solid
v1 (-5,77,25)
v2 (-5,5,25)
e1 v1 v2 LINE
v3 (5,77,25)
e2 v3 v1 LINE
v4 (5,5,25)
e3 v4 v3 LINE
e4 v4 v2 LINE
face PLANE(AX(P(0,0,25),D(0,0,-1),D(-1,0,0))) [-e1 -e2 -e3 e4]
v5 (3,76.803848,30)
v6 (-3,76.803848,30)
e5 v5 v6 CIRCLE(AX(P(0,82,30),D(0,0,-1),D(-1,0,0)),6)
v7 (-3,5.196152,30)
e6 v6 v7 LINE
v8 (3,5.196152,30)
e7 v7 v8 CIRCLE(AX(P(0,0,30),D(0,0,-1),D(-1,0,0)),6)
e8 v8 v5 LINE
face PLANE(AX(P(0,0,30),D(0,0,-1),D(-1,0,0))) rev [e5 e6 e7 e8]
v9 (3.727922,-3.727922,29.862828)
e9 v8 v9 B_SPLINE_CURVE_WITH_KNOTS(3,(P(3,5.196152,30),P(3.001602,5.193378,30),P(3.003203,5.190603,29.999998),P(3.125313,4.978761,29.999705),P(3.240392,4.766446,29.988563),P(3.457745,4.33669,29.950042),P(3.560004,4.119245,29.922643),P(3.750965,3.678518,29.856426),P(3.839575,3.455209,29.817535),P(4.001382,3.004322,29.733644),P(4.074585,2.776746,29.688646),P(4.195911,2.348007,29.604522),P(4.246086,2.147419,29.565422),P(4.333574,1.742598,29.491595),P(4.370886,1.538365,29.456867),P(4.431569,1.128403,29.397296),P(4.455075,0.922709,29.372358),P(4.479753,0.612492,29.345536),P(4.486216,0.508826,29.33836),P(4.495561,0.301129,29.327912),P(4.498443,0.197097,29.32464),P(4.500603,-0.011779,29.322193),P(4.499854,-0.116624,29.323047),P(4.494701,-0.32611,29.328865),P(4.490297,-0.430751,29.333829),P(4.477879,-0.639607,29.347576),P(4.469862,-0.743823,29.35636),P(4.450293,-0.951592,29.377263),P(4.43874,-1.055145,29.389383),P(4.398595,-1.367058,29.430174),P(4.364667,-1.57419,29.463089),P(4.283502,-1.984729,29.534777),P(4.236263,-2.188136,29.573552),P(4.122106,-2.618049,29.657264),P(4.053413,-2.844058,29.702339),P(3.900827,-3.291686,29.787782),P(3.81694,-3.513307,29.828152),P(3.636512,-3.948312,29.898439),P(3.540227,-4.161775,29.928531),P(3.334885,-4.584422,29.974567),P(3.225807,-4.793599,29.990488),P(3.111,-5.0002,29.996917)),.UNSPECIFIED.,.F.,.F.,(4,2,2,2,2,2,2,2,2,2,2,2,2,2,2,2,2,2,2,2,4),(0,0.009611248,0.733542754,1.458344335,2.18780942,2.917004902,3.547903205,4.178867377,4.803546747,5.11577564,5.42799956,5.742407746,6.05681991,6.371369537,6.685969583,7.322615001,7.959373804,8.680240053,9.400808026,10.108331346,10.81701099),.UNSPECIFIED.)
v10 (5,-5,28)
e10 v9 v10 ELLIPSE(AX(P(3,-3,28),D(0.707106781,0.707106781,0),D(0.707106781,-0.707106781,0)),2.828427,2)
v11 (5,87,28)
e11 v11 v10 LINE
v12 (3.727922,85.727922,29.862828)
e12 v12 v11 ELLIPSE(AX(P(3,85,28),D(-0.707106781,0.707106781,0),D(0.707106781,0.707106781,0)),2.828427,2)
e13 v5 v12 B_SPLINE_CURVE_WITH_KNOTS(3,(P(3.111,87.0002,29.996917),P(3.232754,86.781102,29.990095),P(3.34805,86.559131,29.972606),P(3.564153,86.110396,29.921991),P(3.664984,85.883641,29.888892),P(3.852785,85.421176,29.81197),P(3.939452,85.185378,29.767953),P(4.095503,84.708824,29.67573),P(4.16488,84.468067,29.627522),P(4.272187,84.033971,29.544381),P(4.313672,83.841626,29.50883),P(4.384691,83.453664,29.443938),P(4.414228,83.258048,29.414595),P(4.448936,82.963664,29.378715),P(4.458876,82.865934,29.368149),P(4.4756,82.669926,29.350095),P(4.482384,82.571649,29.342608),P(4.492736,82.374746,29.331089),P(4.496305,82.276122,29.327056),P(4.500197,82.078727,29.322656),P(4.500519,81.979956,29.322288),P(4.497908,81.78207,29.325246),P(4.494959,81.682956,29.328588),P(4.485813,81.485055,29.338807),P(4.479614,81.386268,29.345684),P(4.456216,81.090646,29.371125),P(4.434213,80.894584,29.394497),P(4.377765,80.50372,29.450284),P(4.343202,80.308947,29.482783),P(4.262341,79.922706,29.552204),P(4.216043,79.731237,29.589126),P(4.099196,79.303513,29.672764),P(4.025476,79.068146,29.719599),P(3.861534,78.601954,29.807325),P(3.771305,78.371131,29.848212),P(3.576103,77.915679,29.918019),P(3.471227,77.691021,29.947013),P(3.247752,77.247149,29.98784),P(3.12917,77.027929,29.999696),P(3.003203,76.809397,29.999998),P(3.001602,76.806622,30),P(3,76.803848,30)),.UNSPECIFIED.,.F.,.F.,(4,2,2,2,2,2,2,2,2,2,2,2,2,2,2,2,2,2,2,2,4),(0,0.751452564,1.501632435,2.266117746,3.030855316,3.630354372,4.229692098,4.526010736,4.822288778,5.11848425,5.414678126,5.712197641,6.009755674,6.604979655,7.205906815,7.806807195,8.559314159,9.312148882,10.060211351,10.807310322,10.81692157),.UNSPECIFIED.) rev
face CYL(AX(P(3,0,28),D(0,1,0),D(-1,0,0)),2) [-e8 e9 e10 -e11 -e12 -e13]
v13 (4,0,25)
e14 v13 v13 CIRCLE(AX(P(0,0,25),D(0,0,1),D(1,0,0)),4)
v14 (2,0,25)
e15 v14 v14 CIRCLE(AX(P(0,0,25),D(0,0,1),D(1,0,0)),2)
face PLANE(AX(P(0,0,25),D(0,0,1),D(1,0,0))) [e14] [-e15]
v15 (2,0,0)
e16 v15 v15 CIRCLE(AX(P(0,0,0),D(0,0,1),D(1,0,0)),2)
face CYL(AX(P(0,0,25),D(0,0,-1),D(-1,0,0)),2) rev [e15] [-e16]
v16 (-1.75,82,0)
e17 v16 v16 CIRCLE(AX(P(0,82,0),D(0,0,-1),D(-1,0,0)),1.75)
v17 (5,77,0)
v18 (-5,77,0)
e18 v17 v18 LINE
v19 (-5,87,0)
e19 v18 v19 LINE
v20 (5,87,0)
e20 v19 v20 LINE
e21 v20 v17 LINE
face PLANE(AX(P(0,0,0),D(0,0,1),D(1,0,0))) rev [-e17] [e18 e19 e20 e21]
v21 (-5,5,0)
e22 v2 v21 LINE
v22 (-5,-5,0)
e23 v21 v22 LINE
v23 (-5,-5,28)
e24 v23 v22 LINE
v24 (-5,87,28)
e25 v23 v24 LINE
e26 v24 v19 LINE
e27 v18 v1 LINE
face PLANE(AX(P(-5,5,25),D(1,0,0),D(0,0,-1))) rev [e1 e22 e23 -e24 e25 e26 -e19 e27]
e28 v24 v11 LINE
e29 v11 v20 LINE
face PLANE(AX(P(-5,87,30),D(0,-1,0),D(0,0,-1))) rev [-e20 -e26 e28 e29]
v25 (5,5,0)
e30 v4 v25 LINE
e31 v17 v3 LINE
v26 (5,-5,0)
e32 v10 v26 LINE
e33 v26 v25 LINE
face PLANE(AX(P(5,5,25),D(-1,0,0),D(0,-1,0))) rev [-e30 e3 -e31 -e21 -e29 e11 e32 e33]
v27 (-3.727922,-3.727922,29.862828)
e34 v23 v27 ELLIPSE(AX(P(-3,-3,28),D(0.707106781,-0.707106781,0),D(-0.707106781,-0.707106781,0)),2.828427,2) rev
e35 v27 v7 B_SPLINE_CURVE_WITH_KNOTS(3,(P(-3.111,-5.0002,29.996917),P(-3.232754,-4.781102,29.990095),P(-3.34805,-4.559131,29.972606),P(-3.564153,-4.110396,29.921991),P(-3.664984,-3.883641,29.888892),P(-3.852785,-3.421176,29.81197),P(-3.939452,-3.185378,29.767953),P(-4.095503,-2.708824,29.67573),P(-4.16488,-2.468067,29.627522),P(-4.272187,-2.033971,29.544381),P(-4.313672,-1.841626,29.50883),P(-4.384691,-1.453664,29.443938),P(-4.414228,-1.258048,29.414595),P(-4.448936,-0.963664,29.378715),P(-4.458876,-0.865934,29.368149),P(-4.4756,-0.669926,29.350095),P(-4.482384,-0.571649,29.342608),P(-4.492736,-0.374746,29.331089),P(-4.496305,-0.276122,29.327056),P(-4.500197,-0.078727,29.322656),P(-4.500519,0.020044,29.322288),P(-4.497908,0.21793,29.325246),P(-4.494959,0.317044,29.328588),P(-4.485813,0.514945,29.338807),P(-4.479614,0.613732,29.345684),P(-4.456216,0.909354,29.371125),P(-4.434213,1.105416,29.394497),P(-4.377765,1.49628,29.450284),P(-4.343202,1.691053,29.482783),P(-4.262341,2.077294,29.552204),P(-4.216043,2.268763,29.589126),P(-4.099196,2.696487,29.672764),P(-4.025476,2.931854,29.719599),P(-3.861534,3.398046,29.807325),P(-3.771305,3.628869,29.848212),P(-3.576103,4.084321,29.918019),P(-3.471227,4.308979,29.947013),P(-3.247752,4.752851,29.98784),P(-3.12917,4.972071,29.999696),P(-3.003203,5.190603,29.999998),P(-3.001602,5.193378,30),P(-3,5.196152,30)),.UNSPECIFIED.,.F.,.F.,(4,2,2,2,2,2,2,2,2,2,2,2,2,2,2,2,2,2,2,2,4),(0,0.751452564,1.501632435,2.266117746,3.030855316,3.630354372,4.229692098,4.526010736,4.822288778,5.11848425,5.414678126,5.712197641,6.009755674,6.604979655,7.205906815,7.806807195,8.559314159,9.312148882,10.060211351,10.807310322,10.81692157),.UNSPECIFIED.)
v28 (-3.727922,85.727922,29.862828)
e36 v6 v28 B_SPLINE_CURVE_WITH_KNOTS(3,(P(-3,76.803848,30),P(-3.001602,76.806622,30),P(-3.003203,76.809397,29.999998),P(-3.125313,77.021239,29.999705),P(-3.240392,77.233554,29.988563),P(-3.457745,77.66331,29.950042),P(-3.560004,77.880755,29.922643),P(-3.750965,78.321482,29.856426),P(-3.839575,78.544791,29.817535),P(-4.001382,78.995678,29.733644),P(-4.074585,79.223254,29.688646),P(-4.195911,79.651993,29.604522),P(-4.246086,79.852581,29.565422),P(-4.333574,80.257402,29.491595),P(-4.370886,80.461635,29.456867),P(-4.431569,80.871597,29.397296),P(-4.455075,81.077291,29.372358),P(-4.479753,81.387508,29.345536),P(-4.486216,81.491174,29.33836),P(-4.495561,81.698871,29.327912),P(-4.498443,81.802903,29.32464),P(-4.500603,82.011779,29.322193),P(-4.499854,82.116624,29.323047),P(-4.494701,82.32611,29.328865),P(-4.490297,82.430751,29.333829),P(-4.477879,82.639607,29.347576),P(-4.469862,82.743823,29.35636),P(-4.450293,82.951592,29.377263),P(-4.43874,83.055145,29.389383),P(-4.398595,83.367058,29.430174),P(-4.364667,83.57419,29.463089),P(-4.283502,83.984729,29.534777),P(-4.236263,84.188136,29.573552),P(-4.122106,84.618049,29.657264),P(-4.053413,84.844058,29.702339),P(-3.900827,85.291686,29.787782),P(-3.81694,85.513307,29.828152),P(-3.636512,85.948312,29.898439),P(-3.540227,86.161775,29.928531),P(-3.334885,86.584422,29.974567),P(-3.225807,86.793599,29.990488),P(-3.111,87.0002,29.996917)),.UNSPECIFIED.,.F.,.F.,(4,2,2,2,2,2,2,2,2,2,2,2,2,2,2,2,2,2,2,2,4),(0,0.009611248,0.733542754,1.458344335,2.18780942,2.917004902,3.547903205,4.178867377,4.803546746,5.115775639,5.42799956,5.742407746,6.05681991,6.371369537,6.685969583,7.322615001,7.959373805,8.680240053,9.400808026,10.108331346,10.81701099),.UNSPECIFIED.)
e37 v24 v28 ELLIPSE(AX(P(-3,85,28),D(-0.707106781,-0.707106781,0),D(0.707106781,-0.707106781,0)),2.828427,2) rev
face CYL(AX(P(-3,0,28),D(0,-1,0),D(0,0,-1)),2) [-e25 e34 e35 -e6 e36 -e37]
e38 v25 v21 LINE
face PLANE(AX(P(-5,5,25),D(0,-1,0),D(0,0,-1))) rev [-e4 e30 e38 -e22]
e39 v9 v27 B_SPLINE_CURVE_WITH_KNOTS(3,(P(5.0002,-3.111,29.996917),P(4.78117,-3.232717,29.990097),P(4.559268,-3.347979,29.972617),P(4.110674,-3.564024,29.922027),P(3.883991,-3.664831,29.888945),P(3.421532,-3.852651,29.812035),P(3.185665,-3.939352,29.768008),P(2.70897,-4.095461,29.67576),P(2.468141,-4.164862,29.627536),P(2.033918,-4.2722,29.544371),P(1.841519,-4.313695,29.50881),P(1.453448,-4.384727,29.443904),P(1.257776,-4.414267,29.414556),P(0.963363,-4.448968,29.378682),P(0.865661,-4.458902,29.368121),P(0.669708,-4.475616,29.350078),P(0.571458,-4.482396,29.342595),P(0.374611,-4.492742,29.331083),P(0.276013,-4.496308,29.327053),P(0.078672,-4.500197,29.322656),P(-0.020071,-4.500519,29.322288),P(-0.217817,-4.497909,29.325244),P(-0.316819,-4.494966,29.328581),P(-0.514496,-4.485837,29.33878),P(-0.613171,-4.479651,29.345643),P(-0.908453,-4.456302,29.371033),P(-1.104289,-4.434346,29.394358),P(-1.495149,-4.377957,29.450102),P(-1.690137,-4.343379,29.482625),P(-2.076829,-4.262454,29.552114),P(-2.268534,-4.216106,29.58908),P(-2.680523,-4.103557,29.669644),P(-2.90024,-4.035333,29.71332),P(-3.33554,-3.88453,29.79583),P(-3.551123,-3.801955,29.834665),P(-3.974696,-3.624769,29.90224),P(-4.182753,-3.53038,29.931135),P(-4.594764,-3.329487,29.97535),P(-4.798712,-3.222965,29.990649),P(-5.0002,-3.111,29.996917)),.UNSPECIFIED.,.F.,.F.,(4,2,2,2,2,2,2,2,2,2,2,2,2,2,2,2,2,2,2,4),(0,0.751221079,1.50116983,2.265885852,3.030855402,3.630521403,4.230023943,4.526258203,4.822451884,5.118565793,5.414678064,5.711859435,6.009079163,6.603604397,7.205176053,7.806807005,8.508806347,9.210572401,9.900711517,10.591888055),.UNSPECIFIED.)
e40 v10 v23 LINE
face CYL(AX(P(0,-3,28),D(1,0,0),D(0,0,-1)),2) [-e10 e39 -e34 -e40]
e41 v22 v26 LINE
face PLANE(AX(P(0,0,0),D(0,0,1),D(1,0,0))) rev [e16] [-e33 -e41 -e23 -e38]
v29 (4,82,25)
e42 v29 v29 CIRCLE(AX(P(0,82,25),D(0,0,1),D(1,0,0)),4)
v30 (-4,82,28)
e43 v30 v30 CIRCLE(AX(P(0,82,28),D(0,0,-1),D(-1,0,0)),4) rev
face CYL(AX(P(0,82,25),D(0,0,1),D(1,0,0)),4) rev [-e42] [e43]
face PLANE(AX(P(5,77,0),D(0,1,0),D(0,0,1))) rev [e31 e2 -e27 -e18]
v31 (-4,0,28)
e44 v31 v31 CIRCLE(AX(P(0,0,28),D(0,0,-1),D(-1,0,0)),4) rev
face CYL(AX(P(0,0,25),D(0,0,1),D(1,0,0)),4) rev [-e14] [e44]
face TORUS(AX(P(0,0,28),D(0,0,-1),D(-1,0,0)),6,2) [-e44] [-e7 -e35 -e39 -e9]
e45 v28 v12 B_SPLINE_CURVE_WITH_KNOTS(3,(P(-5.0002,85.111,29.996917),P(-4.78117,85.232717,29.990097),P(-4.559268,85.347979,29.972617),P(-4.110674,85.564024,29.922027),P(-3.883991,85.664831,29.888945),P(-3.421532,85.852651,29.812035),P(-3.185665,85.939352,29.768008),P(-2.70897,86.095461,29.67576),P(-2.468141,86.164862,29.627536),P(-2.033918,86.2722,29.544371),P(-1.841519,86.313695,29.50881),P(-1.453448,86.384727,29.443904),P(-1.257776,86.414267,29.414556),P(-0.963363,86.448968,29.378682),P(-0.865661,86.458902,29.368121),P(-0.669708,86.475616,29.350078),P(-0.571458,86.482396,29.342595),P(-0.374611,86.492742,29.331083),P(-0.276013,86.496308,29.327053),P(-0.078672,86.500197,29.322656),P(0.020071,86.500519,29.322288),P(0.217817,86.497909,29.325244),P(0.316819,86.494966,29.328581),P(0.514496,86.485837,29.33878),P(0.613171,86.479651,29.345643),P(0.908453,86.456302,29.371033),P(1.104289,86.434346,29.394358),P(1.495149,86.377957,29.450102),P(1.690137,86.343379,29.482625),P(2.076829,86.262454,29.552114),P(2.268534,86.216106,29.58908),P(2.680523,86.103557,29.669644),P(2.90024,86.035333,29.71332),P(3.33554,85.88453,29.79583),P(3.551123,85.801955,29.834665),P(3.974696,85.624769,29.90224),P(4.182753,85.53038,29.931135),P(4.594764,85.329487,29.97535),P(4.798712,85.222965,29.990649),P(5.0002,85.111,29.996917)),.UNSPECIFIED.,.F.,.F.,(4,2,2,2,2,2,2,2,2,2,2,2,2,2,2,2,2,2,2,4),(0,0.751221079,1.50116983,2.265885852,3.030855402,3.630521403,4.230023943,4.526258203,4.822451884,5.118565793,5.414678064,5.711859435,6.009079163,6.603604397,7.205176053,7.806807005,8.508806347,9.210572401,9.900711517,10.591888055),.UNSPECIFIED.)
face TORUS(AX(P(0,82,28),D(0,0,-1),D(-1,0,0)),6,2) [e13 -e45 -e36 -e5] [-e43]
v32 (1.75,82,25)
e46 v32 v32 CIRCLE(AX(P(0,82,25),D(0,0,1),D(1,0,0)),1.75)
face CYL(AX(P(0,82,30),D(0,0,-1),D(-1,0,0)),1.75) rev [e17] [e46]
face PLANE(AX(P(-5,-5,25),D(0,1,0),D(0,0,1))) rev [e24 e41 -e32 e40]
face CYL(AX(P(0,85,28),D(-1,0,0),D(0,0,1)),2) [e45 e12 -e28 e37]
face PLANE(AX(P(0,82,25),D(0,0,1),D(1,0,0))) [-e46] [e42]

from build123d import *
from build123d.topology import SkipClean

# Parameters (mm, degrees)
SCHIZZO1_W                   = 10
SCHIZZO1_H                   = 10
SCHIZZO1_R                   = 2
ESTRUSIONE_ESTRUSIONE1_DEPTH = 25
SCHIZZO2_W                   = 10
SCHIZZO2_H                   = 92
SCHIZZO2_R                   = 1.75
SCHIZZO2_R_2                 = 2
ESTRUSIONE_ESTRUSIONE2_DEPTH = 5
ESTRUSIONE_ESTRUSIONE3_START = 25
SCHIZZO3_W                   = 10
SCHIZZO3_H                   = 10
SCHIZZO3_R                   = 1.75
ESTRUSIONE_ESTRUSIONE3_DEPTH = 25
SCHIZZO4_R                   = 4
TAGLIO_ESTRUSIONE1_DEPTH     = 5
RACCORDO1_R                  = 2


with BuildPart() as part:
    # Schizzo1 → Estrusione-Estrusione1 (new body)
    with BuildSketch(Plane.XY):
        Rectangle(SCHIZZO1_W, SCHIZZO1_H)
        Circle(SCHIZZO1_R, mode=Mode.SUBTRACT)
    extrude(amount=ESTRUSIONE_ESTRUSIONE1_DEPTH)

    # Schizzo2 → Estrusione-Estrusione2 (add)
    with BuildSketch(Plane.XY.offset(25)):
        with Locations((0, 41)):
            Rectangle(SCHIZZO2_W, SCHIZZO2_H)
        with Locations((0, 82)):
            Circle(SCHIZZO2_R, mode=Mode.SUBTRACT)
        Circle(SCHIZZO2_R_2, mode=Mode.SUBTRACT)
    extrude(amount=ESTRUSIONE_ESTRUSIONE2_DEPTH)

    # Schizzo3 → Estrusione-Estrusione3 (add)
    with SkipClean():  # the faces are left unmerged after this step: merging them gives an invalid solid
        with BuildSketch(Plane(origin=(0, 0, 25), x_dir=(-1, 0, 0), z_dir=(0, 0, -1)).offset(ESTRUSIONE_ESTRUSIONE3_START)):
            with Locations((0, 82)):
                Rectangle(SCHIZZO3_W, SCHIZZO3_H)
            with Locations((0, 82)):
                Circle(SCHIZZO3_R, mode=Mode.SUBTRACT)
        extrude(amount=-ESTRUSIONE_ESTRUSIONE3_DEPTH)

    # Schizzo4 → Taglio-Estrusione1 (cut)
    with BuildSketch(Plane.XY.offset(30)):
        Circle(SCHIZZO4_R)
        with Locations((0, 82)):
            Circle(SCHIZZO4_R)
    extrude(amount=-TAGLIO_ESTRUSIONE1_DEPTH, mode=Mode.SUBTRACT)

    # Raccordo1
    # the kernel refuses this fillet: 2 mm, written as the material it takes off along each edge
    with BuildSketch(Plane(origin=(-5, 92, 30), x_dir=(1, 0, 0), z_dir=(0, -1, 0)), Plane(origin=(5, -10, 30), x_dir=(-1, 0, 0), z_dir=(0, 1, 0))) as raccordo1_piece_1:
        with BuildLine():
            CenterArc((RACCORDO1_R, -RACCORDO1_R), RACCORDO1_R, 90, 90)
            Line((0, -RACCORDO1_R), (0, 0))
            Line((0, 0), (RACCORDO1_R, 0))
        make_face()
    extrude(amount=102, mode=Mode.SUBTRACT)
    with BuildSketch(Plane(origin=(-10, -5, 30), x_dir=(0, 1, 0), z_dir=(1, 0, 0)), Plane(origin=(10, 87, 30), x_dir=(0, -1, 0), z_dir=(-1, 0, 0))) as raccordo1_piece_2:
        with BuildLine():
            CenterArc((RACCORDO1_R, -RACCORDO1_R), RACCORDO1_R, 90, 90)
            Line((0, -RACCORDO1_R), (0, 0))
            Line((0, 0), (RACCORDO1_R, 0))
        make_face()
    extrude(amount=20, mode=Mode.SUBTRACT)
    with BuildSketch(Plane(origin=(0, 0, 30), x_dir=(1, 0, 0), z_dir=(0, -1, 0))) as raccordo1_piece_3:
        with BuildLine():
            CenterArc((4 + RACCORDO1_R, -RACCORDO1_R), RACCORDO1_R, 90, 90)
            Line((4, -RACCORDO1_R), (4, 0))
            Line((4, 0), (4 + RACCORDO1_R, 0))
        make_face()
    revolve(axis=Axis((0, 0, 30), (0, 0, 1)), mode=Mode.SUBTRACT)
    with BuildSketch(Plane(origin=(0, 82, 30), x_dir=(1, 0, 0), z_dir=(0, -1, 0))) as raccordo1_piece_4:
        with BuildLine():
            CenterArc((4 + RACCORDO1_R, -RACCORDO1_R), RACCORDO1_R, 90, 90)
            Line((4 + RACCORDO1_R, 0), (4, 0))
            Line((4, 0), (4, -RACCORDO1_R))
        make_face()
    revolve(axis=Axis((0, 82, 30), (0, 0, 1)), mode=Mode.SUBTRACT)


solid = part.part
